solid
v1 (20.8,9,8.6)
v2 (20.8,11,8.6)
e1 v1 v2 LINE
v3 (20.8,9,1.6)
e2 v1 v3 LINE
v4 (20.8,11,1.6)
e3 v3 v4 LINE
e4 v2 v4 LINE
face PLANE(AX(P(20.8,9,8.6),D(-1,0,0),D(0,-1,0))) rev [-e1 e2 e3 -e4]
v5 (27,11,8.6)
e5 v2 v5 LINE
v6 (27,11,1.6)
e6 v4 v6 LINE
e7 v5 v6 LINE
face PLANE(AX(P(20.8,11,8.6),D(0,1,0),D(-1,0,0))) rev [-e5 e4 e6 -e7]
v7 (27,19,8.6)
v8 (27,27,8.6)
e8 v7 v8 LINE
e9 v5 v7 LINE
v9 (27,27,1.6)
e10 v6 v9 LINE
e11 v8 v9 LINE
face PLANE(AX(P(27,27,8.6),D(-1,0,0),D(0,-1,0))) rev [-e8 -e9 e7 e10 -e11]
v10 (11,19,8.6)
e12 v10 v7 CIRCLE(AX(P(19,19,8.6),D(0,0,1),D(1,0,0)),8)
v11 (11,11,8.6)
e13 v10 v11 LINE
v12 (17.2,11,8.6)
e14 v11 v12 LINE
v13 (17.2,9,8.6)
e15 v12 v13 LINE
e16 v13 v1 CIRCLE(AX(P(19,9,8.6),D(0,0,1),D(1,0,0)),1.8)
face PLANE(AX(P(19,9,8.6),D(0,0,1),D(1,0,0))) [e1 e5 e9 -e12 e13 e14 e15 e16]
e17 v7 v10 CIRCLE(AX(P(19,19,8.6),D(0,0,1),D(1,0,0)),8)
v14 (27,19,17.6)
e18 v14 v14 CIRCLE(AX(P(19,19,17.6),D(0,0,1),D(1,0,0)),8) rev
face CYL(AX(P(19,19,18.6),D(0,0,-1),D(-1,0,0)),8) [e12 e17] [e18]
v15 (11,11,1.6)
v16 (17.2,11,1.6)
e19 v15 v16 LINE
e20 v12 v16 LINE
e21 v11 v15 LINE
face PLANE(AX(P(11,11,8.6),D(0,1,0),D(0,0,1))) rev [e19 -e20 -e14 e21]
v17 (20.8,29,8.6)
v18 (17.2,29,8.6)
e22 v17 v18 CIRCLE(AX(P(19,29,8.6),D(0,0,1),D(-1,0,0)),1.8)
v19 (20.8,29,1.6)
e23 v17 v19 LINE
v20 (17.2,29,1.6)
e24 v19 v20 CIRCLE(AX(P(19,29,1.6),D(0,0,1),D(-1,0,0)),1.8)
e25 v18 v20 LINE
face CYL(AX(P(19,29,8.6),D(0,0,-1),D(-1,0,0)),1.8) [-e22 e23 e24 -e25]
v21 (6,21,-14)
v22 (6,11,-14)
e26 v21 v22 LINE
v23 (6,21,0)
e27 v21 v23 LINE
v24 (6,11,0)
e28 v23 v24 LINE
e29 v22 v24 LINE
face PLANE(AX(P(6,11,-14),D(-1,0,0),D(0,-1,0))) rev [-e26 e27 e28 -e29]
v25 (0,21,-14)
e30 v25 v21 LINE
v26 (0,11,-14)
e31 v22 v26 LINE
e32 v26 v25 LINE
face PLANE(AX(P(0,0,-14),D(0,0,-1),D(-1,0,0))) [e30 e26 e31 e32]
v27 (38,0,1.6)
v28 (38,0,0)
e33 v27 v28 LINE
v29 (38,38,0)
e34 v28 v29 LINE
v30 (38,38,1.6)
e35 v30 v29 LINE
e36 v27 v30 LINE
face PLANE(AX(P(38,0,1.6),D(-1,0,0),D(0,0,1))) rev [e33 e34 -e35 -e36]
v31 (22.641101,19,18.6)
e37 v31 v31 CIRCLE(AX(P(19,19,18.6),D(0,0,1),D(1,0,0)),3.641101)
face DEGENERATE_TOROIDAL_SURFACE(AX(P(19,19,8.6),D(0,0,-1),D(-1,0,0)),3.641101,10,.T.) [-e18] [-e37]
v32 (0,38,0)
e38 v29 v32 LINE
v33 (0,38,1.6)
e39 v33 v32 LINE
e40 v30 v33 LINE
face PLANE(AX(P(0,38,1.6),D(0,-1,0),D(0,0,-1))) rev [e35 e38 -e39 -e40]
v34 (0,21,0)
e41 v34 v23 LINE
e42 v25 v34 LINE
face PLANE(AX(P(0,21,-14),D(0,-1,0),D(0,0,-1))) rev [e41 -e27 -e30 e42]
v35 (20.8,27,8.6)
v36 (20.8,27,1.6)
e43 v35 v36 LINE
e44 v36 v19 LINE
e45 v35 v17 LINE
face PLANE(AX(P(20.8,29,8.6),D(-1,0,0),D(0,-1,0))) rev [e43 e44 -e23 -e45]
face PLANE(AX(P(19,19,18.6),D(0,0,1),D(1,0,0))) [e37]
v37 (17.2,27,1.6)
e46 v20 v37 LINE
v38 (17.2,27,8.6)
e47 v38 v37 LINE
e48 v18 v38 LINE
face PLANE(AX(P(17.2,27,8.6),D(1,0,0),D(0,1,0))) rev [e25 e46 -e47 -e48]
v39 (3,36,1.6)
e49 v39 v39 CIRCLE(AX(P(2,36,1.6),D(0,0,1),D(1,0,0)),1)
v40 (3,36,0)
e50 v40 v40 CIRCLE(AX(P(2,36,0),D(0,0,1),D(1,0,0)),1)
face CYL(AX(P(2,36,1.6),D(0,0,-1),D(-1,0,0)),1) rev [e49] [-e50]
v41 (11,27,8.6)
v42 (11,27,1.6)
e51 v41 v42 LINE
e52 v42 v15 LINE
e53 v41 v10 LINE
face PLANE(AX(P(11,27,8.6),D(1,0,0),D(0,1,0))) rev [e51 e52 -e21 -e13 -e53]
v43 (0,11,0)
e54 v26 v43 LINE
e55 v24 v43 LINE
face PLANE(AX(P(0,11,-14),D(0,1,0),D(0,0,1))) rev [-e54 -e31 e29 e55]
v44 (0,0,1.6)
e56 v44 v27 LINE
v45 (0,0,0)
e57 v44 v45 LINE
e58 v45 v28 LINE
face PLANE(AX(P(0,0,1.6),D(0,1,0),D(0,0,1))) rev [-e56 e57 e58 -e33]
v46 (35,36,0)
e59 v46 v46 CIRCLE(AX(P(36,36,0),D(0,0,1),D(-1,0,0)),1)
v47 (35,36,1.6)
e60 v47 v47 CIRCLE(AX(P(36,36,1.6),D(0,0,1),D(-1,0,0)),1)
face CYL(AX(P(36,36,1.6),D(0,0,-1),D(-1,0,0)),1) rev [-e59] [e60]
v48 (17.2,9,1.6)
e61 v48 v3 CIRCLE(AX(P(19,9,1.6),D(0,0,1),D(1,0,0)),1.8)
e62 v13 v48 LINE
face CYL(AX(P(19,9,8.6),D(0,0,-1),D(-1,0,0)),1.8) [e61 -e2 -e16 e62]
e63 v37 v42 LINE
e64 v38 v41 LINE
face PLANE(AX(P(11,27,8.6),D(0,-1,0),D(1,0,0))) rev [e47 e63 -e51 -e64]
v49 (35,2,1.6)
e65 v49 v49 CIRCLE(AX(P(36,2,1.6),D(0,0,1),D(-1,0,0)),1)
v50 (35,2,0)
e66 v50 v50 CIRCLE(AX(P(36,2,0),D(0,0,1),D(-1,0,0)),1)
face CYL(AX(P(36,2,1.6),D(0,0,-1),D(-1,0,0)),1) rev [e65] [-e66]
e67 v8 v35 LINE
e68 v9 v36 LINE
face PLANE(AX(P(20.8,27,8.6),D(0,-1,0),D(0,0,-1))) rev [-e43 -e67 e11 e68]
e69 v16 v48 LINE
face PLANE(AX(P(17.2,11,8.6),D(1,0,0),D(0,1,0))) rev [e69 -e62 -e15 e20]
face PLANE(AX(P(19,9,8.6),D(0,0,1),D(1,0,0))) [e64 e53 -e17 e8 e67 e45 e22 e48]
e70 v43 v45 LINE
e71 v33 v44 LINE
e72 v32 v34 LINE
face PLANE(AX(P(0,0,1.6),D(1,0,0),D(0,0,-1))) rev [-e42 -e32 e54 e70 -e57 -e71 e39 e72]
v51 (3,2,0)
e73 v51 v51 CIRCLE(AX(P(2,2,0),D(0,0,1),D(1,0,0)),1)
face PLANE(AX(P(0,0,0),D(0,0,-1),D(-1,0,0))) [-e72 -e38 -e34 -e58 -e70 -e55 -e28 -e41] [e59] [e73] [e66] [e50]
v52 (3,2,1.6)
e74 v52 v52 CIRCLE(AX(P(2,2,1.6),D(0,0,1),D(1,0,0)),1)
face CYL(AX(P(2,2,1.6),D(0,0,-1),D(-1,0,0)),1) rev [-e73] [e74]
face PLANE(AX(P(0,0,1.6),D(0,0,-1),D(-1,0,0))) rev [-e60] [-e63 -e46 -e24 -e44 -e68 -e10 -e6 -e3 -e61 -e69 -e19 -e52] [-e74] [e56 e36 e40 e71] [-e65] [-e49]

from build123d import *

# Parameters (mm, degrees)
ESQUISSE1_W        = 38
ESQUISSE1_H        = 38
ESQUISSE1_R        = 1
BOSS_EXTRU_1_DEPTH = 1.6
BOSS_EXTRU_2_DEPTH = 7
ESQUISSE3_R        = 8
BOSS_EXTRU_3_DEPTH = 10
CHANFREIN1_SIZE    = 1
CHANFREIN1_SIZE2   = 1.732050808
CONG_1_R           = 10
ESQUISSE4_W        = 6
ESQUISSE4_H        = 10
BOSS_EXTRU_4_DEPTH = 14


with BuildPart() as part:
    # Esquisse1 → Boss.-Extru.1 (new body)
    with BuildSketch(Plane.XY):
        with Locations((19, 19)):
            Rectangle(ESQUISSE1_W, ESQUISSE1_H)
        with Locations((2, 36)):
            Circle(ESQUISSE1_R, mode=Mode.SUBTRACT)
        with Locations((2, 2)):
            Circle(ESQUISSE1_R, mode=Mode.SUBTRACT)
        with Locations(Location((36, 2, 0), (0, 0, 180))):
            Circle(ESQUISSE1_R, mode=Mode.SUBTRACT)
        with Locations(Location((36, 36, 0), (0, 0, 180))):
            Circle(ESQUISSE1_R, mode=Mode.SUBTRACT)
    extrude(amount=BOSS_EXTRU_1_DEPTH)

    # Esquisse2 → Boss.-Extru.2 (add)
    with BuildSketch(Plane.XY.offset(1.6)):
        with BuildLine():
            Line((11, 27), (17.2, 27))
            Line((17.2, 27), (17.2, 29))
            ThreePointArc((17.2, 29), (19, 30.8), (20.8, 29))
            Line((20.8, 29), (20.8, 27))
            Line((20.8, 27), (27, 27))
            Line((27, 27), (27, 11))
            Line((27, 11), (20.8, 11))
            Line((20.8, 11), (20.8, 9))
            ThreePointArc((20.8, 9), (19, 7.2), (17.2, 9))
            Line((17.2, 9), (17.2, 11))
            Line((17.2, 11), (11, 11))
            Line((11, 11), (11, 27))
        make_face()
    extrude(amount=BOSS_EXTRU_2_DEPTH)

    # Esquisse3 → Boss.-Extru.3 (add)
    with BuildSketch(Plane.XY.offset(8.6)):
        with Locations((19, 19)):
            Circle(ESQUISSE3_R)
    extrude(amount=BOSS_EXTRU_3_DEPTH)

    # Chanfrein1
    chanfrein1_edges = [part.edges().sort_by_distance(p)[0] for p in [
        (11, 19, 18.6),
    ]]
    chanfrein1_side = [part.faces().sort_by_distance(p)[0] for p in [
        (11, 19, 13.6),
    ]]
    chamfer(chanfrein1_edges, length=CHANFREIN1_SIZE, length2=CHANFREIN1_SIZE2, reference=chanfrein1_side[0])

    # Congé1
    # the kernel refuses this fillet: 10 mm, written as the material it takes off along each edge
    with BuildSketch(Plane(origin=(19, 19, 18.6), x_dir=(1, 0, 0), z_dir=(0, -1, 0))) as cong_1_piece_1:
        with BuildLine():
            CenterArc((3.641101056, -10), CONG_1_R, 64.158067237, 25.841932763)
            Line((3.641101056, 0), (3.641101056, 0.2))
            Line((3.641101056, 0.2), (6.267949192, 0.2))
            Line((6.267949192, 0.2), (6.367949192, 0.173205081))
            ThreePointArc((6.367949192, 0.173205081), (7.233974596, -0.326794919), (8.087177979, -0.82))
            Line((8.087177979, -0.82), (8, -1))
        make_face()
    revolve(axis=Axis((19, 19, 18.6), (0, 0, 1)), mode=Mode.SUBTRACT)

    # Esquisse4 → Boss.-Extru.4 (add)
    with BuildSketch(Plane(origin=(0, 0, 0), x_dir=(-1, 0, 0), z_dir=(0, 0, -1))):
        with Locations((-3, 16)):
            Rectangle(ESQUISSE4_W, ESQUISSE4_H)
    extrude(amount=BOSS_EXTRU_4_DEPTH)


solid = part.part
